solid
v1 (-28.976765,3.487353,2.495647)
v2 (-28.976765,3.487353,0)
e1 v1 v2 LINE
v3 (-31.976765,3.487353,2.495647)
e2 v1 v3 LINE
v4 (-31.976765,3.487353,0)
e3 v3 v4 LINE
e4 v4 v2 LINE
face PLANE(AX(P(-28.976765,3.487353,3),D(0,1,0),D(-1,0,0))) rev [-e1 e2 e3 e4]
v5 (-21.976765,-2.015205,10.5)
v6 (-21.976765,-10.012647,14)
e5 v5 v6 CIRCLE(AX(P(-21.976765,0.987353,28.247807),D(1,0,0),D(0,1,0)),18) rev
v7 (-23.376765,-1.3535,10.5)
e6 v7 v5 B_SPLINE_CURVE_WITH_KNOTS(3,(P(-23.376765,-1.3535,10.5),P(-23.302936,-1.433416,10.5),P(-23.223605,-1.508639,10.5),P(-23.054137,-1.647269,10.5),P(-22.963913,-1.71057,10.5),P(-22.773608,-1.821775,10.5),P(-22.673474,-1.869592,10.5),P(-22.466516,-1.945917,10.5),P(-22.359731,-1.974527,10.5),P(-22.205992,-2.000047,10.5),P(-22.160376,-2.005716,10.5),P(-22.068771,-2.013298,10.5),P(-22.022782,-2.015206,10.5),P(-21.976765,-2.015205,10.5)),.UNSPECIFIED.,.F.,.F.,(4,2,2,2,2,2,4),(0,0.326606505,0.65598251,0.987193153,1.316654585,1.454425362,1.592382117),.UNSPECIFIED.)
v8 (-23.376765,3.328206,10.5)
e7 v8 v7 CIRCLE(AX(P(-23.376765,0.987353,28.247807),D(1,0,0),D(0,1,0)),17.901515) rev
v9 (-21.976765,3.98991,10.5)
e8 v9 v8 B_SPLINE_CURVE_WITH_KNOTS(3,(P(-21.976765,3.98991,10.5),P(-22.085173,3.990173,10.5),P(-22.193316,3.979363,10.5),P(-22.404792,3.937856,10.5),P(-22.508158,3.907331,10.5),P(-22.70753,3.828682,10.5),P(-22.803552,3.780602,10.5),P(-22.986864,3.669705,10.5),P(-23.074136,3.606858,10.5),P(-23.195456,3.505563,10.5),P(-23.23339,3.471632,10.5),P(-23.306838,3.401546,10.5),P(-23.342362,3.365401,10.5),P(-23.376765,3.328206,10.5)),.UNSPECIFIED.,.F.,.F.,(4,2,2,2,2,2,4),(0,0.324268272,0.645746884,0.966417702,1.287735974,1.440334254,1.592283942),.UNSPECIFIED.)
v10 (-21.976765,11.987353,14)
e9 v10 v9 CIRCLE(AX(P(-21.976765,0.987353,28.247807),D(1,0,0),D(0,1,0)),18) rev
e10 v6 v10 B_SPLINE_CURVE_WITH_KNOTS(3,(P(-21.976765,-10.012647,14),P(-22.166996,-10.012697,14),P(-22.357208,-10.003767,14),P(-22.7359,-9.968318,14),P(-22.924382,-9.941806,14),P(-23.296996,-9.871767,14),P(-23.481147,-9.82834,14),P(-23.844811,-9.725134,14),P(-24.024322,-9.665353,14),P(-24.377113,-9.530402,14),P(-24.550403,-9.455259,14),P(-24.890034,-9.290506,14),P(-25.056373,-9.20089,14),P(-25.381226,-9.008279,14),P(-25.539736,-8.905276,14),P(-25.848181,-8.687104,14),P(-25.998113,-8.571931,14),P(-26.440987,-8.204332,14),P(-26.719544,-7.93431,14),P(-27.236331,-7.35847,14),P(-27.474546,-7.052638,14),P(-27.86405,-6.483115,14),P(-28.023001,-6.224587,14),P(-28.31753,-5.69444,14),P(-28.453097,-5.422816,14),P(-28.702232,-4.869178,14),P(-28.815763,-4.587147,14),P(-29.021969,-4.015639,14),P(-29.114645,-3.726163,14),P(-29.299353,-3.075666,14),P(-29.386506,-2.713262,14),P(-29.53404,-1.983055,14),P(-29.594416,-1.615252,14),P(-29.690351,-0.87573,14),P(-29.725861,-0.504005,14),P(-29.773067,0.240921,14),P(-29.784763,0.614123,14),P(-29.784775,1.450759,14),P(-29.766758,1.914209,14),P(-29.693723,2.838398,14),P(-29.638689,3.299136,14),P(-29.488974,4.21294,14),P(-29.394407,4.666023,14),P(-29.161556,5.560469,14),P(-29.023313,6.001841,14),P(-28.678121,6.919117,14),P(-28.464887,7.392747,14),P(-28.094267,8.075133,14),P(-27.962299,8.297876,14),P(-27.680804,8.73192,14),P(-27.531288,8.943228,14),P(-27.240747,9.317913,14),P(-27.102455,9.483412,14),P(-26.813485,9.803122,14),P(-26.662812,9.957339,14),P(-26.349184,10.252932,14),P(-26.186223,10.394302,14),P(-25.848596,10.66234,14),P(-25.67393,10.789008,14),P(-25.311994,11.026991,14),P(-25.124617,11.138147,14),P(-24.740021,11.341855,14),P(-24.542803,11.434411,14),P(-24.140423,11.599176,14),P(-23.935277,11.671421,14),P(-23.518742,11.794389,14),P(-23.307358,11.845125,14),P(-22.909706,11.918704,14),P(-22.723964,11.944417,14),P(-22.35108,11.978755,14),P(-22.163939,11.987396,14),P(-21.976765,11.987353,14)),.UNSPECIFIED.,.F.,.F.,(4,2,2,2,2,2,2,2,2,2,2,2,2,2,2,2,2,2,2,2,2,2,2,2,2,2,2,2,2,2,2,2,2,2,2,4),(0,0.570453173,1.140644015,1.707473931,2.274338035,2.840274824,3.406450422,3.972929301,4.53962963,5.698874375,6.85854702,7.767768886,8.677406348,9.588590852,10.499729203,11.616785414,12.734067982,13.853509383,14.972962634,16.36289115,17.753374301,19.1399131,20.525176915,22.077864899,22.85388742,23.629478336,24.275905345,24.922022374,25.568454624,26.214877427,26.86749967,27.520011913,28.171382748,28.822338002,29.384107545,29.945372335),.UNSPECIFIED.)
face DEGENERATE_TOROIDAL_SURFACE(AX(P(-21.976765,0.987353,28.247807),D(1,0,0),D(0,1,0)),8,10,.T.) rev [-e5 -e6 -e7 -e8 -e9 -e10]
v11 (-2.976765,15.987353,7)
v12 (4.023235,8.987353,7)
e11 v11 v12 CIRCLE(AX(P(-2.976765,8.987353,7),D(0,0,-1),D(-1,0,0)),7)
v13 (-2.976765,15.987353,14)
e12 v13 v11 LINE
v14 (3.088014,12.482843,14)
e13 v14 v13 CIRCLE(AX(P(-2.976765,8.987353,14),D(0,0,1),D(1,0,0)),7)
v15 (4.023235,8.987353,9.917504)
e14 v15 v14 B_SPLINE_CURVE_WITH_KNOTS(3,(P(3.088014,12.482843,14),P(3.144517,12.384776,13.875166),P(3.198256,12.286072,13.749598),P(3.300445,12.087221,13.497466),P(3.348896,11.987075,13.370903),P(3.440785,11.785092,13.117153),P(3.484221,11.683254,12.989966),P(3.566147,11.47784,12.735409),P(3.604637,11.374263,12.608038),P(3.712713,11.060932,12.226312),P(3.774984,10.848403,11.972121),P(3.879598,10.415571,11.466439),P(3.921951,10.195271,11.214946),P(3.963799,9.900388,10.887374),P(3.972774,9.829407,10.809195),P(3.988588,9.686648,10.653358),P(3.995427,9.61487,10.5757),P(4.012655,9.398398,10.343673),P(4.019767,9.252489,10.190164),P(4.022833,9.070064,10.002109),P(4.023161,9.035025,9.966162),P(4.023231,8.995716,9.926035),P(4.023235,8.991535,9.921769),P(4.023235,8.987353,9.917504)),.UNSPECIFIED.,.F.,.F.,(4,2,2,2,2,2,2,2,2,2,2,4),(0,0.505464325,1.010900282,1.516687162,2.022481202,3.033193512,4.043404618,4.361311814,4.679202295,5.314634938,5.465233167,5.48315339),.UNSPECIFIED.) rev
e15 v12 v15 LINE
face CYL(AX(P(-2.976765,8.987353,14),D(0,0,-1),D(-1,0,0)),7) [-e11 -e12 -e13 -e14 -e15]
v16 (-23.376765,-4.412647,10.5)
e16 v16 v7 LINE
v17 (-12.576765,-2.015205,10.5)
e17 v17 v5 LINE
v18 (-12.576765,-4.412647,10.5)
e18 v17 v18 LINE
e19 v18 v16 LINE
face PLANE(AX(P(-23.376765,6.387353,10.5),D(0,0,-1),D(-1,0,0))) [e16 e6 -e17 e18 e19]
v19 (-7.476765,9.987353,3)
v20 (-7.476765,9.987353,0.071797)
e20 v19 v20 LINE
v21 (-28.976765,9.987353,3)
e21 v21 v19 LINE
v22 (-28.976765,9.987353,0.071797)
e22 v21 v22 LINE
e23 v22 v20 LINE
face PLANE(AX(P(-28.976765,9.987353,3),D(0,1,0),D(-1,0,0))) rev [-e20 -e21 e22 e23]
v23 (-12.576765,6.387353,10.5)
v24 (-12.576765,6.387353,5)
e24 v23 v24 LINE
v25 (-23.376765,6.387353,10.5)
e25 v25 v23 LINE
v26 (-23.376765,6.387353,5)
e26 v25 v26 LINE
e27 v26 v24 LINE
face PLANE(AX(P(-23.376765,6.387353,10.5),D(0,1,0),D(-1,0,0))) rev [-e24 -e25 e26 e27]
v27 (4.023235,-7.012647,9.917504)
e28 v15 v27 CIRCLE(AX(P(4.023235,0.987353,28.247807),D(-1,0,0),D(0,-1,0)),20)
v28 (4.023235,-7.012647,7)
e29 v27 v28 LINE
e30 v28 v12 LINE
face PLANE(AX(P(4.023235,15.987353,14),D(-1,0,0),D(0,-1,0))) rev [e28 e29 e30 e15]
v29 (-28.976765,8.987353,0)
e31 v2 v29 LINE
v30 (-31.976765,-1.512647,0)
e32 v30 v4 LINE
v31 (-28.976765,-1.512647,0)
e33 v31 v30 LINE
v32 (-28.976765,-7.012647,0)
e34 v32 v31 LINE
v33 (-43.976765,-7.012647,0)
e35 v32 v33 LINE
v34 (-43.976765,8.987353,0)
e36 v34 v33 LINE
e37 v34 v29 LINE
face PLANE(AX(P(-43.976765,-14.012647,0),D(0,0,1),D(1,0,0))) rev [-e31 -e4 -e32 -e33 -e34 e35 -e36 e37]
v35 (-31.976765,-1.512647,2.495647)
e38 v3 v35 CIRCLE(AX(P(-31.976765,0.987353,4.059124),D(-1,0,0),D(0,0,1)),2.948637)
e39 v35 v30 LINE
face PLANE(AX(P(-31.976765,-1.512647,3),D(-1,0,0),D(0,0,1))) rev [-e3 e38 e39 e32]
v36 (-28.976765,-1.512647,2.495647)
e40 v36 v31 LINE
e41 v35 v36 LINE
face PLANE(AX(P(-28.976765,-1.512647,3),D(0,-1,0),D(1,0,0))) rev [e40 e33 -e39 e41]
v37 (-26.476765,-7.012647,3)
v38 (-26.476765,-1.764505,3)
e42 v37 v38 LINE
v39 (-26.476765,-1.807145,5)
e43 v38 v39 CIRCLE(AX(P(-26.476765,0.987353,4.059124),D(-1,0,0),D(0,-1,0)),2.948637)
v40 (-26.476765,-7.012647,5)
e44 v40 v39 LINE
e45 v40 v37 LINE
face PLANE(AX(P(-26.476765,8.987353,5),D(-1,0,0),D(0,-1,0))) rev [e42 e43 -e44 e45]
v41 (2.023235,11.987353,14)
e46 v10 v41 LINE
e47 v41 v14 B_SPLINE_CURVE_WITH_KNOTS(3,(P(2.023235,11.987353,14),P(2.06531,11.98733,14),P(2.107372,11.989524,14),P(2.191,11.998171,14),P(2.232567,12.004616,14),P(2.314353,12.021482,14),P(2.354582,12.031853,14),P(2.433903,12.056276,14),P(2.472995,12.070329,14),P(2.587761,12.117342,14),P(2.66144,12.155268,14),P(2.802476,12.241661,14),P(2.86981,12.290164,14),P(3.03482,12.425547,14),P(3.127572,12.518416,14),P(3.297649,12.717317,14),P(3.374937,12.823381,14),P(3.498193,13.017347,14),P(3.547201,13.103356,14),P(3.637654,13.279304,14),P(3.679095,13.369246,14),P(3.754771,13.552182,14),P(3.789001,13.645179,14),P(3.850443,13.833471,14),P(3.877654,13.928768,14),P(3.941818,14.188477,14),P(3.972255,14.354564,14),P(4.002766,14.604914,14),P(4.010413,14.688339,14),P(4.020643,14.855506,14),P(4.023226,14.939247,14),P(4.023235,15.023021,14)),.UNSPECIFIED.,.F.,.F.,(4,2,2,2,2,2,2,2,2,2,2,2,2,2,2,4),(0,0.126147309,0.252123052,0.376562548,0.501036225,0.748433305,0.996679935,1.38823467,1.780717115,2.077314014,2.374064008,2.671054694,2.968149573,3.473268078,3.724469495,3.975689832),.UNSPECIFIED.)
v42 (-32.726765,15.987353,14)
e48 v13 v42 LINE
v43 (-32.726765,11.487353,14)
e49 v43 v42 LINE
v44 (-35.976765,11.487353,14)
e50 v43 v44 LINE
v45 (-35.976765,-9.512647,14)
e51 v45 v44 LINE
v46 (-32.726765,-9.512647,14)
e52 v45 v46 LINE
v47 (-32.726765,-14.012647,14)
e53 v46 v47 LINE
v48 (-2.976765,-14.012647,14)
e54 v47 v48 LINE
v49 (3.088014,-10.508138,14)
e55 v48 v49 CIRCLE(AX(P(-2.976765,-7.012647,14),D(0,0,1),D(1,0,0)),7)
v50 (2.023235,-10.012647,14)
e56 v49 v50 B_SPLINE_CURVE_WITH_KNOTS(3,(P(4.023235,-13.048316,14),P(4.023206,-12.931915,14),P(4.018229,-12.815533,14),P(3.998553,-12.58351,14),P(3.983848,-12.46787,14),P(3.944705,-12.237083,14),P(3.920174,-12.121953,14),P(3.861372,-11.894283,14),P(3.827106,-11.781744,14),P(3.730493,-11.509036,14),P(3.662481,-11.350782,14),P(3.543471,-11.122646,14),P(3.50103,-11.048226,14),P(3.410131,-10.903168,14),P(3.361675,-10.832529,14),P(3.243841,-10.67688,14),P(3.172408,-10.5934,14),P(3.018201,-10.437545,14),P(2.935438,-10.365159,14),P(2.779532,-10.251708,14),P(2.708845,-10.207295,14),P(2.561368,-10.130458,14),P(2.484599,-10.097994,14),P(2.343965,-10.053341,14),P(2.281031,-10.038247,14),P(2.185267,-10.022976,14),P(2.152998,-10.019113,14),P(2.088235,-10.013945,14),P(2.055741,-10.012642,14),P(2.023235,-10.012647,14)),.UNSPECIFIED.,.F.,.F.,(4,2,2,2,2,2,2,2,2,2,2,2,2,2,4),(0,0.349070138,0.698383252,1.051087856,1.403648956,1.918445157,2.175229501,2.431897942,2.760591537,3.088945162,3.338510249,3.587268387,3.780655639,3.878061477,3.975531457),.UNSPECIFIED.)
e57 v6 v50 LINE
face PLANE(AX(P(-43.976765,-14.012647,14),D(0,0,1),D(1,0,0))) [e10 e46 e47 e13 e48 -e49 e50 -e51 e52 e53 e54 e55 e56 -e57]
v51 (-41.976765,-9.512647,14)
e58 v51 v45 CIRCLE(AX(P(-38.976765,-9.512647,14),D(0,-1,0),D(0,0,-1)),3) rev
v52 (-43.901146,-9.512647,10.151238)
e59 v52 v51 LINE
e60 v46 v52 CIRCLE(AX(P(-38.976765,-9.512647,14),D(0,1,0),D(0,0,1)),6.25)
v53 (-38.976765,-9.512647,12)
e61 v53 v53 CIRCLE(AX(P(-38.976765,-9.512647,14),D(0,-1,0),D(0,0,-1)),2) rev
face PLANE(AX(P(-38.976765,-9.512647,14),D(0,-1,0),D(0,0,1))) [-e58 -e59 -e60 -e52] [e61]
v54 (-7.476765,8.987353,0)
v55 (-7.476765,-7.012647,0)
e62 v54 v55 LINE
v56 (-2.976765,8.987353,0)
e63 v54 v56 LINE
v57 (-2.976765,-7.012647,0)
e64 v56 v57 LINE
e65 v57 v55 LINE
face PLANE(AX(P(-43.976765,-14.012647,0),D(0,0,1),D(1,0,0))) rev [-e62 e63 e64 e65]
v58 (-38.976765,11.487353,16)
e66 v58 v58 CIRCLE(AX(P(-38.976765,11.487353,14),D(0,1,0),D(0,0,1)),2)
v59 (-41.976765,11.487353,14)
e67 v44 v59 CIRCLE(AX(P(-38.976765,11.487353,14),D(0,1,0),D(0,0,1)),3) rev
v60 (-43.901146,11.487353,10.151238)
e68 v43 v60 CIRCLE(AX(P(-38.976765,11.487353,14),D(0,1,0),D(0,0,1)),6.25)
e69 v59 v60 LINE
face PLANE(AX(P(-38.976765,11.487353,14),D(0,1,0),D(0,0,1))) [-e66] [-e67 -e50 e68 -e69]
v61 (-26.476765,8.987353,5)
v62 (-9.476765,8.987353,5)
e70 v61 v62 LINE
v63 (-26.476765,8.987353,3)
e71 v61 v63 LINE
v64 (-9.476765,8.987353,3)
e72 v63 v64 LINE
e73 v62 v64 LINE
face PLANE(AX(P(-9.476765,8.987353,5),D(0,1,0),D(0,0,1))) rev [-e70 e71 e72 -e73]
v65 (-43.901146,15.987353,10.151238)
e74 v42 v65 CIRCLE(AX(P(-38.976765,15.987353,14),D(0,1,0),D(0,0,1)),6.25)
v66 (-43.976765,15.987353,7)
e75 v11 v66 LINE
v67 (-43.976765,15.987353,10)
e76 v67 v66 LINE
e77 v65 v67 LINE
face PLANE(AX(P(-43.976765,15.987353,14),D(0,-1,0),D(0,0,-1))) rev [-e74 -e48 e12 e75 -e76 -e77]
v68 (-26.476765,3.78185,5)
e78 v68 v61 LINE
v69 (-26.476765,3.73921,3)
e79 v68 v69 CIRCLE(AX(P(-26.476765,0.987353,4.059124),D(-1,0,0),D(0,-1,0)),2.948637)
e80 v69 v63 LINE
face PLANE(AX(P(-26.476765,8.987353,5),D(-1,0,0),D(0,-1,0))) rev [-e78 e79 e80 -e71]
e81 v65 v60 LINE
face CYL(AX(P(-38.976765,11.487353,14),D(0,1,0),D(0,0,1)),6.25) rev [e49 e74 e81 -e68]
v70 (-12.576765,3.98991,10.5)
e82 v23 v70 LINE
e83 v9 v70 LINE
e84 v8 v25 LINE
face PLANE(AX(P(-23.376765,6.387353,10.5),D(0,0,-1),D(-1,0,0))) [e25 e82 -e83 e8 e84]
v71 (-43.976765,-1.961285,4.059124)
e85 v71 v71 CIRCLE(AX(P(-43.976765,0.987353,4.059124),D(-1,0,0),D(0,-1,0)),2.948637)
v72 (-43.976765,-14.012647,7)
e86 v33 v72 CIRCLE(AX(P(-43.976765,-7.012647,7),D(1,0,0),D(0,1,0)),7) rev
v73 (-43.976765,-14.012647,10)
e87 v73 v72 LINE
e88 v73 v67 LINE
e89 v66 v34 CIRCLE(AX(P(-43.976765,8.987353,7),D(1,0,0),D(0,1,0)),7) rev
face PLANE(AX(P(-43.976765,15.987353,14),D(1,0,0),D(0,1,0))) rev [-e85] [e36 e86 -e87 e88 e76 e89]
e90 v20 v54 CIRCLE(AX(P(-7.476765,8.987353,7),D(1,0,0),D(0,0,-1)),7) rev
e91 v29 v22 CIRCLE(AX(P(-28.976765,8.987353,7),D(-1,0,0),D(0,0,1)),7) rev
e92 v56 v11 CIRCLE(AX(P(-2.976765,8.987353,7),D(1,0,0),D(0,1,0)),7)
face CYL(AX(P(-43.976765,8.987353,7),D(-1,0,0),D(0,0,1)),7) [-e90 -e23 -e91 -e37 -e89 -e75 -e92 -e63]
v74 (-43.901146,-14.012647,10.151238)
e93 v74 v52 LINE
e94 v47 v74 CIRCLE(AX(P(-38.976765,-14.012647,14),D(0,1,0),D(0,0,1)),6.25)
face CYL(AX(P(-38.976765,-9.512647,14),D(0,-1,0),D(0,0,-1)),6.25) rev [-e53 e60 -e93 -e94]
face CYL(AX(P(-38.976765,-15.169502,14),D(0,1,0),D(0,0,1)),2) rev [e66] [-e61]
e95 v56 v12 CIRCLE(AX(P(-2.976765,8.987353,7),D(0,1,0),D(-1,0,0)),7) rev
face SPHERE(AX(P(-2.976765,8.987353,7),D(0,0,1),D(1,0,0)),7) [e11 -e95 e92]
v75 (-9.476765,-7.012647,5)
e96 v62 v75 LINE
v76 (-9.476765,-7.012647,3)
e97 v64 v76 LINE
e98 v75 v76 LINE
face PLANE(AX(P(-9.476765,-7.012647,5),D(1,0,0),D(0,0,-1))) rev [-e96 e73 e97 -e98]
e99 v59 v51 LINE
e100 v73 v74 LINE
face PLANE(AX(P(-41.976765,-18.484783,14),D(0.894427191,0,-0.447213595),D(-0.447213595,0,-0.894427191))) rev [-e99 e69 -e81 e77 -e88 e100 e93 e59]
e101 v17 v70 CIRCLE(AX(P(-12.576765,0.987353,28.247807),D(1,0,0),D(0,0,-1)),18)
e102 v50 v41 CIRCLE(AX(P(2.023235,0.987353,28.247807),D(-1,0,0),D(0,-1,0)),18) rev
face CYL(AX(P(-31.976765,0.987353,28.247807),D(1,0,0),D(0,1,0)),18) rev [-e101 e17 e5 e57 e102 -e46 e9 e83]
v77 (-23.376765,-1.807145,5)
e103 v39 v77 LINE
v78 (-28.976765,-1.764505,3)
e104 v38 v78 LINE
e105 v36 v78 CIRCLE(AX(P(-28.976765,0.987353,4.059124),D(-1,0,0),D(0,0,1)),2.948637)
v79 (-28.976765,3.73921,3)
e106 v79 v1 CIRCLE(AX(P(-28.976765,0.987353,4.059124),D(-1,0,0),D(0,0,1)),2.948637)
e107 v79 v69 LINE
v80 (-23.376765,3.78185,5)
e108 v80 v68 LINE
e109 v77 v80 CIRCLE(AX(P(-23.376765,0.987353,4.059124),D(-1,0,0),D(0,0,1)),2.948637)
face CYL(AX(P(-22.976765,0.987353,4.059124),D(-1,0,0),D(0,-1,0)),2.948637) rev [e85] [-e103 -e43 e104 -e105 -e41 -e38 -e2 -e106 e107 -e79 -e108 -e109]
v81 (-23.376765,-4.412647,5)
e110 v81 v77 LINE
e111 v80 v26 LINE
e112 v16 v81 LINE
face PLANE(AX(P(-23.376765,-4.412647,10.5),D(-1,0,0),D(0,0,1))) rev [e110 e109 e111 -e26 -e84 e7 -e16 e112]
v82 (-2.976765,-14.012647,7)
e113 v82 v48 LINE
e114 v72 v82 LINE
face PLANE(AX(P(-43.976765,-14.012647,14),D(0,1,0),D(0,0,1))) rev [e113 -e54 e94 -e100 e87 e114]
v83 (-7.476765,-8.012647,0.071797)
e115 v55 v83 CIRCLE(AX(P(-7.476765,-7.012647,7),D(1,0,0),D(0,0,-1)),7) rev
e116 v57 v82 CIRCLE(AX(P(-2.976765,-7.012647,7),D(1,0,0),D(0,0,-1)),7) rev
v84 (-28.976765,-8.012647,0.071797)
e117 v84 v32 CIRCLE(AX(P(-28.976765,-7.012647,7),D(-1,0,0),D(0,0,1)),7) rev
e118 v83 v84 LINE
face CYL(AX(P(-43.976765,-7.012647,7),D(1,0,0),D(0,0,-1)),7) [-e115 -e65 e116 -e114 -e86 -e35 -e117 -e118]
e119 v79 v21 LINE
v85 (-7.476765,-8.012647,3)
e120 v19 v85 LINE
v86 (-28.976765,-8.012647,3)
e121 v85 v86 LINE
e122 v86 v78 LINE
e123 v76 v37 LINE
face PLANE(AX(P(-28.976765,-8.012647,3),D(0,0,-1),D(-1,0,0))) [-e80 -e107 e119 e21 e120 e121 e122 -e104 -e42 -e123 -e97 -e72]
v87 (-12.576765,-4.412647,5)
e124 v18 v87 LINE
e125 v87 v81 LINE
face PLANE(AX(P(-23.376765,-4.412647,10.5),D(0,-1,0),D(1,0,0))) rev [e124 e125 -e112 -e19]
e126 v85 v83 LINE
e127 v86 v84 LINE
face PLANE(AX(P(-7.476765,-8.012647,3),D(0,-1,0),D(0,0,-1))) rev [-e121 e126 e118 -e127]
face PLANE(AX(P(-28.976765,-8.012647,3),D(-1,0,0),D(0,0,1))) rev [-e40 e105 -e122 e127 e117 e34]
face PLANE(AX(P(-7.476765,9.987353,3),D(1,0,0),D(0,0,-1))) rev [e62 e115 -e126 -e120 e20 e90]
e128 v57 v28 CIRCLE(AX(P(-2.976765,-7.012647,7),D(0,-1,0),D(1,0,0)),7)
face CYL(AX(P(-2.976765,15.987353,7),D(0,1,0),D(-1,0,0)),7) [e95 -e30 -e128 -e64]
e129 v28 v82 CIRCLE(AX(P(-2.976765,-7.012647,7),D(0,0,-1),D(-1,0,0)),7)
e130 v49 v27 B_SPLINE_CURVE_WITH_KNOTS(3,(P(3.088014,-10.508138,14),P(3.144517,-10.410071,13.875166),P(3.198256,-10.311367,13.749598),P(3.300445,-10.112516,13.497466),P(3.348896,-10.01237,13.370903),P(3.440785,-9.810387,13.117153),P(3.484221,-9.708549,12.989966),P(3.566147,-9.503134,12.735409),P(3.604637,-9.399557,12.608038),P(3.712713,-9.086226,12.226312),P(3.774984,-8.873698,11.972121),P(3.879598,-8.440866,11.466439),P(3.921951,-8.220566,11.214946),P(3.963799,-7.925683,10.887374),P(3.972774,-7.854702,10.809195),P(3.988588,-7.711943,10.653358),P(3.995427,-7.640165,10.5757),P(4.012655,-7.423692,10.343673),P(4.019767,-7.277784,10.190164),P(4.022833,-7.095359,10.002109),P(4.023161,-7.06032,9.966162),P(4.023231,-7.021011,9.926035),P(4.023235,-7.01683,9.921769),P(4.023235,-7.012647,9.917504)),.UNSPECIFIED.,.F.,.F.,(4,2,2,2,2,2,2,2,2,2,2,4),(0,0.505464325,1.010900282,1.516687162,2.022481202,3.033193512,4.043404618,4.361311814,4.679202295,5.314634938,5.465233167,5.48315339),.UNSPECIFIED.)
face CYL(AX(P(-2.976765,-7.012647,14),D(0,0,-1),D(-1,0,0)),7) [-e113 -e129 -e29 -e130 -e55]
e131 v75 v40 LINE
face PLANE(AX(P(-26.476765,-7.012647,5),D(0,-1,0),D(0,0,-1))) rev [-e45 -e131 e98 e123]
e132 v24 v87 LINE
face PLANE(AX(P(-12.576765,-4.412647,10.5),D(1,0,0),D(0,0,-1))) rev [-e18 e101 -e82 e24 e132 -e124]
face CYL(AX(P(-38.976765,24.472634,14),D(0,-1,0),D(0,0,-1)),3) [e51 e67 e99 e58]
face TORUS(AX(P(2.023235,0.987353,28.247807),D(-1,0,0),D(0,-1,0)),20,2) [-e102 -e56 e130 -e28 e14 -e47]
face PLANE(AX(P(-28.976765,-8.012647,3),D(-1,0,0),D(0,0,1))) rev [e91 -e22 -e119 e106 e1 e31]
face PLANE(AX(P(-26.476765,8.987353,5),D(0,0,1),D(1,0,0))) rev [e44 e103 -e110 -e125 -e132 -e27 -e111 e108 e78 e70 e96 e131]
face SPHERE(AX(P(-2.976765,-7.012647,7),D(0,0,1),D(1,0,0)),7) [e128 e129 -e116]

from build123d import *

# Parameters (mm, degrees)
CROQUIS1_W                 = 48
CROQUIS1_H                 = 30
SALIENTE_EXTRUIR1_DEPTH    = 14
CORTAR_EXTRUIR1_DEPTH      = 36
REDONDEO1_R                = 2
REDONDEO2_R                = 7
CROQUIS3_W                 = 21.5
CROQUIS3_H                 = 18
CORTAR_EXTRUIR2_DEPTH      = 3
CORTAR_EXTRUIR3_REACH      = 50.842
CORTAR_EXTRUIR3_END_RADIUS = 18
CROQUIS5_R                 = 1
CROQUIS6_W                 = 10.8
CROQUIS6_H                 = 10.8
CORTAR_EXTRUIR4_DEPTH      = 7.5
CROQUIS7_W                 = 17
CROQUIS7_H                 = 16
CORTAR_EXTRUIR5_DEPTH      = 2
CROQUIS9_R                 = 3
SALIENTE_EXTRUIR2_DEPTH    = 30
CROQUIS10_R                = 6.25
CORTAR_EXTRUIR7_DEPTH      = 4.5
CROQUIS11_R                = 2
CORTAR_EXTRUIR8_DEPTH      = 21
CORTAR_EXTRUIR9_REACH      = 57.883
CROQUIS13_W                = 3
CROQUIS13_H                = 5
CORTAR_EXTRUIR10_DEPTH     = 3
REDONDEO3_R                = 10
CROQUIS14_R                = 2.948637221
CORTAR_EXTRUIR15_DEPTH     = 21


with BuildPart() as part:
    # Croquis1 → Saliente-Extruir1 (new body)
    with BuildSketch(Plane.XY):
        with Locations((-19.976765257, 0.987352556)):
            Rectangle(CROQUIS1_W, CROQUIS1_H)
    extrude(amount=SALIENTE_EXTRUIR1_DEPTH)

    # Croquis2 → Cortar-Extruir1 (cut)
    with BuildSketch(Plane(origin=(4.023234743, 0, 0), x_dir=(0, 0, -1), z_dir=(1, 0, 0))):
        with BuildLine():
            ThreePointArc((-14, -10.012647444), (-10.247806849, 0.987352556), (-14, 11.987352556))
            Line((-14, 11.987352556), (-14, -10.012647444))
        make_face()
    extrude(amount=-CORTAR_EXTRUIR1_DEPTH, mode=Mode.SUBTRACT)

    # Redondeo1
    redondeo1_edges = [part.edges().sort_by_distance(p)[0] for p in [
        (4.023234743, 0.987352556, 10.247806849),
    ]]
    fillet(redondeo1_edges, radius=REDONDEO1_R)

    # Redondeo2
    # the kernel refuses this fillet: 7 mm, written as the material it takes off along each edge
    with BuildSketch(Plane(origin=(-2.976765257, -7.012647444, 7), x_dir=(0, -1, 0), z_dir=(1, 0, 0))) as redondeo2_piece_1_section:
        Polygon((0, 0), (REDONDEO2_R * 1.02, 0), (REDONDEO2_R * 1.02, REDONDEO2_R * 1.02), (0, REDONDEO2_R * 1.02), align=None)
    redondeo2_piece_1 = extrude(amount=REDONDEO2_R * 1.02, mode=Mode.PRIVATE)
    redondeo2_piece_1 = redondeo2_piece_1 - Plane(origin=(-2.976765257, -7.012647444, 7), x_dir=(0, 0.7071067811865475, 0.7071067811865475), z_dir=(1, 0, 0)) * Sphere(REDONDEO2_R, mode=Mode.PRIVATE)
    add(redondeo2_piece_1, mode=Mode.SUBTRACT)
    with BuildSketch(Plane(origin=(-2.976765257, 8.987352556, 7), x_dir=(0, 0, -1), z_dir=(1, 0, 0))) as redondeo2_piece_2_section:
        Polygon((0, 0), (REDONDEO2_R * 1.02, 0), (REDONDEO2_R * 1.02, REDONDEO2_R * 1.02), (0, REDONDEO2_R * 1.02), align=None)
    redondeo2_piece_2 = extrude(amount=REDONDEO2_R * 1.02, mode=Mode.PRIVATE)
    redondeo2_piece_2 = redondeo2_piece_2 - Plane(origin=(-2.976765257, 8.987352556, 7), x_dir=(0, -0.7071067811865475, 0.7071067811865475), z_dir=(1, 0, 0)) * Sphere(REDONDEO2_R, mode=Mode.PRIVATE)
    add(redondeo2_piece_2, mode=Mode.SUBTRACT)
    with BuildSketch(Plane(origin=(-2.976765257, -14.012647444, 0), x_dir=(0, 0, 1), z_dir=(-1, 0, 0))) as redondeo2_piece_3:
        with BuildLine():
            CenterArc((REDONDEO2_R, REDONDEO2_R), REDONDEO2_R, 180, 90)
            Line((0, REDONDEO2_R), (-REDONDEO2_R * 0.02, REDONDEO2_R))
            Line((-REDONDEO2_R * 0.02, REDONDEO2_R), (-REDONDEO2_R * 0.02, -REDONDEO2_R * 0.02))
            Line((-REDONDEO2_R * 0.02, -REDONDEO2_R * 0.02), (REDONDEO2_R, -REDONDEO2_R * 0.02))
            Line((REDONDEO2_R, -REDONDEO2_R * 0.02), (REDONDEO2_R, 0))
        make_face()
    extrude(amount=58.5, mode=Mode.SUBTRACT)
    with BuildSketch(Plane(origin=(4.023234743, 8.987352556, 0), x_dir=(0, 0, 1), z_dir=(0, -1, 0))) as redondeo2_piece_4:
        with BuildLine():
            CenterArc((REDONDEO2_R, REDONDEO2_R), REDONDEO2_R, 180, 90)
            Line((0, REDONDEO2_R), (-REDONDEO2_R * 0.02, REDONDEO2_R))
            Line((-REDONDEO2_R * 0.02, REDONDEO2_R), (-REDONDEO2_R * 0.02, -REDONDEO2_R * 0.02))
            Line((-REDONDEO2_R * 0.02, -REDONDEO2_R * 0.02), (REDONDEO2_R, -REDONDEO2_R * 0.02))
            Line((REDONDEO2_R, -REDONDEO2_R * 0.02), (REDONDEO2_R, 0))
        make_face()
    extrude(amount=16, mode=Mode.SUBTRACT)
    with BuildSketch(Plane(origin=(-61.476765257, 15.987352556, 0), x_dir=(0, -1, 0), z_dir=(1, 0, 0))) as redondeo2_piece_5:
        with BuildLine():
            CenterArc((REDONDEO2_R, -REDONDEO2_R), REDONDEO2_R, 90, 90)
            Line((0, -REDONDEO2_R), (-REDONDEO2_R * 0.02, -REDONDEO2_R))
            Line((-REDONDEO2_R * 0.02, -REDONDEO2_R), (-REDONDEO2_R * 0.02, REDONDEO2_R * 0.02))
            Line((-REDONDEO2_R * 0.02, REDONDEO2_R * 0.02), (REDONDEO2_R, REDONDEO2_R * 0.02))
            Line((REDONDEO2_R, REDONDEO2_R * 0.02), (REDONDEO2_R, 0))
        make_face()
    extrude(amount=58.5, mode=Mode.SUBTRACT)
    with BuildSketch(Plane(origin=(4.023234743, 15.987352556, 7), x_dir=(0, -1, 0), z_dir=(0, 0, 1))) as redondeo2_piece_6:
        with BuildLine():
            CenterArc((REDONDEO2_R, -REDONDEO2_R), REDONDEO2_R, 90, 90)
            Line((0, -REDONDEO2_R), (-REDONDEO2_R * 0.02, -REDONDEO2_R))
            Line((-REDONDEO2_R * 0.02, -REDONDEO2_R), (-REDONDEO2_R * 0.02, REDONDEO2_R * 0.02))
            Line((-REDONDEO2_R * 0.02, REDONDEO2_R * 0.02), (REDONDEO2_R, REDONDEO2_R * 0.02))
            Line((REDONDEO2_R, REDONDEO2_R * 0.02), (REDONDEO2_R, 0))
        make_face()
    extrude(amount=24.5, mode=Mode.SUBTRACT)
    with BuildSketch(Plane(origin=(4.023234743, -14.012647444, 7), x_dir=(0, 1, 0), z_dir=(0, 0, 1))) as redondeo2_piece_7:
        with BuildLine():
            CenterArc((REDONDEO2_R, REDONDEO2_R), REDONDEO2_R, 180, 90)
            Line((0, REDONDEO2_R), (-REDONDEO2_R * 0.02, REDONDEO2_R))
            Line((-REDONDEO2_R * 0.02, REDONDEO2_R), (-REDONDEO2_R * 0.02, -REDONDEO2_R * 0.02))
            Line((-REDONDEO2_R * 0.02, -REDONDEO2_R * 0.02), (REDONDEO2_R, -REDONDEO2_R * 0.02))
            Line((REDONDEO2_R, -REDONDEO2_R * 0.02), (REDONDEO2_R, 0))
        make_face()
    extrude(amount=24.5, mode=Mode.SUBTRACT)

    # Croquis3 → Cortar-Extruir2 (cut)
    with BuildSketch(Plane(origin=(0, 0, 0), x_dir=(-1, 0, 0), z_dir=(0, 0, -1))):
        with Locations((18.226765257, 0.987352556)):
            Rectangle(CROQUIS3_W, CROQUIS3_H)
    extrude(amount=-CORTAR_EXTRUIR2_DEPTH, mode=Mode.SUBTRACT)

    # Cortar-Extruir3: up to this cylinder (the profile starts outside it)
    cortar_extruir3_end = Plane(origin=(-17.976765, 0.987352556, 28.247806849), z_dir=(1, 0, 0)) * Cylinder(CORTAR_EXTRUIR3_END_RADIUS, 138.684, mode=Mode.PRIVATE)
    # Croquis5 → Cortar-Extruir3 (cut, up to the surface)
    with BuildSketch(Plane(origin=(0, 0, 0), x_dir=(-1, 0, 0), z_dir=(0, 0, -1)), mode=Mode.PRIVATE) as cortar_extruir3_sk1:
        with Locations((17.976765257, 0.987352556)):
            Circle(CROQUIS5_R)
    cortar_extruir3_tool1 = extrude(cortar_extruir3_sk1.sketch, amount=-CORTAR_EXTRUIR3_REACH, mode=Mode.PRIVATE) - cortar_extruir3_end
    add(cortar_extruir3_tool1.solids().sort_by_distance((-17.976765, 0.987353, 0))[0], mode=Mode.SUBTRACT)

    # Croquis6 → Cortar-Extruir4 (cut)
    with BuildSketch(Plane(origin=(0, 0, 3), x_dir=(-1, 0, 0), z_dir=(0, 0, -1))):
        with Locations((17.976765257, 0.987352556)):
            Rectangle(CROQUIS6_W, CROQUIS6_H)
    extrude(amount=-CORTAR_EXTRUIR4_DEPTH, mode=Mode.SUBTRACT)

    # Croquis7 → Cortar-Extruir5 (cut)
    with BuildSketch(Plane(origin=(0, 0, 3), x_dir=(-1, 0, 0), z_dir=(0, 0, -1))):
        with Locations((17.976765257, 0.987352556)):
            Rectangle(CROQUIS7_W, CROQUIS7_H)
    extrude(amount=-CORTAR_EXTRUIR5_DEPTH, mode=Mode.SUBTRACT)

    # Croquis9 → Saliente-Extruir2 (add)
    with BuildSketch(Plane.XZ.offset(14.012647444)):
        with Locations((-38.976765257, 14)):
            Circle(CROQUIS9_R)
    extrude(amount=-SALIENTE_EXTRUIR2_DEPTH)

    # Croquis10 → Cortar-Extruir7 (cut)
    with BuildSketch(Plane(origin=(0, 15.987352556, 0), x_dir=(1, 0, 0), z_dir=(0, 1, 0))):
        with Locations((-38.976765257, -14)):
            Circle(CROQUIS10_R)
    cortar_extruir7 = extrude(amount=-CORTAR_EXTRUIR7_DEPTH, mode=Mode.SUBTRACT)

    # Simetría1: Cortar-Extruir7 across plane
    add(cortar_extruir7.mirror(Plane.ZX.offset(0.987352556)), mode=Mode.SUBTRACT)

    # Croquis11 → Cortar-Extruir8 (cut)
    with BuildSketch(Plane(origin=(0, 11.487352556, 0), x_dir=(-1, 0, 0), z_dir=(0, 1, 0))):
        with Locations(Location((38.976765257, 14, 0), (0, 0, 90))):
            Circle(CROQUIS11_R)
    extrude(amount=-CORTAR_EXTRUIR8_DEPTH, mode=Mode.SUBTRACT)

    # Cortar-Extruir9: up to this face of the body (flat: up to its plane)
    cortar_extruir9_end = Plane(part.part.faces().sort_by_distance((-19.613737998, -14.012647444, 10.301702011))[0])
    # Croquis12 → Cortar-Extruir9 (cut, up to the picked face)
    with BuildSketch(Plane(origin=(0, 15.987352556, 0), x_dir=(1, 0, 0), z_dir=(0, 1, 0)), mode=Mode.PRIVATE) as cortar_extruir9_sk1:
        Polygon((-43.976765257, -10), (-43.976765257, -14), (-41.976765257, -14), align=None)
    cortar_extruir9_tool1 = split(extrude(cortar_extruir9_sk1.sketch, amount=-CORTAR_EXTRUIR9_REACH, mode=Mode.PRIVATE), bisect_by=cortar_extruir9_end, keep=Keep.BOTH, mode=Mode.PRIVATE)
    add(cortar_extruir9_tool1.solids().sort_by(Axis((-43.310099, 15.987353, 12.666667), (0, -1, 0)))[0], mode=Mode.SUBTRACT)

    # Croquis13 → Cortar-Extruir10 (cut)
    with BuildSketch(Plane(origin=(0, 0, 0), x_dir=(-1, 0, 0), z_dir=(0, 0, -1))):
        with Locations((30.476765257, 0.987352556)):
            Rectangle(CROQUIS13_W, CROQUIS13_H)
    extrude(amount=-CORTAR_EXTRUIR10_DEPTH, mode=Mode.SUBTRACT)

    # Redondeo3
    # the kernel refuses this fillet: 10 mm, written as the material it adds along each edge
    with BuildSketch(Plane(origin=(-31.976765257, 0.987352556, 28.247806849), x_dir=(0, -0.8888591986408035, 0.45818045025036674), z_dir=(0, 0.45818045025036674, 0.8888591986408035))) as redondeo3_piece_1_section:
        with BuildLine():
            CenterArc((18 - REDONDEO3_R, REDONDEO3_R), REDONDEO3_R, 270, 90)
            Line((18 - REDONDEO3_R, 0), (18, 0))
            Line((18, 0), (18, REDONDEO3_R))
        make_face()
    redondeo3_piece_1 = revolve(axis=Axis((-31.976765257, 0.987352556, 28.247806849), (1, 0, 0)), revolution_arc=234.53951494, mode=Mode.PRIVATE)
    redondeo3_piece_1 = split(redondeo3_piece_1, bisect_by=Plane(origin=(-22.679016641, -5.92095726, 14), z_dir=(0, 0, -1)), keep=Keep.TOP, mode=Mode.PRIVATE)
    redondeo3_piece_1 = split(redondeo3_piece_1, bisect_by=Plane(origin=(-22.679016641, -5.92095726, 10.5), z_dir=(0, 0, 1)), keep=Keep.TOP, mode=Mode.PRIVATE)
    add(redondeo3_piece_1)
    with BuildSketch(Plane(origin=(-31.976765257, 0.987352556, 28.247806849), x_dir=(0, -0.8888591986408035, 0.45818045025036674), z_dir=(0, 0.45818045025036674, 0.8888591986408035))) as redondeo3_piece_2_section:
        with BuildLine():
            CenterArc((18 - REDONDEO3_R, REDONDEO3_R), REDONDEO3_R, 270, 90)
            Line((18 - REDONDEO3_R, 0), (18, 0))
            Line((18, 0), (18, REDONDEO3_R))
        make_face()
    redondeo3_piece_2 = revolve(axis=Axis((-31.976765257, 0.987352556, 28.247806849), (1, 0, 0)), revolution_arc=234.53951494, mode=Mode.PRIVATE)
    redondeo3_piece_2 = split(redondeo3_piece_2, bisect_by=Plane(origin=(-27.760529224, 0.987352545, 10.5), z_dir=(0, 0, -1)), keep=Keep.TOP, mode=Mode.PRIVATE)
    redondeo3_piece_2 = split(redondeo3_piece_2, bisect_by=Plane(origin=(-23.376765257, 0.987352545, 10.397912487), z_dir=(-1, 0, 0)), keep=Keep.TOP, mode=Mode.PRIVATE)
    add(redondeo3_piece_2)

    # Croquis14 → Cortar-Extruir15 (cut)
    with BuildSketch(Plane.ZY.offset(43.976765257)):
        with Locations(Location((4.059124212, 0.987352556, 0), (0, 0, 270))):
            Circle(CROQUIS14_R)
    extrude(amount=-CORTAR_EXTRUIR15_DEPTH, mode=Mode.SUBTRACT)


solid = part.part
